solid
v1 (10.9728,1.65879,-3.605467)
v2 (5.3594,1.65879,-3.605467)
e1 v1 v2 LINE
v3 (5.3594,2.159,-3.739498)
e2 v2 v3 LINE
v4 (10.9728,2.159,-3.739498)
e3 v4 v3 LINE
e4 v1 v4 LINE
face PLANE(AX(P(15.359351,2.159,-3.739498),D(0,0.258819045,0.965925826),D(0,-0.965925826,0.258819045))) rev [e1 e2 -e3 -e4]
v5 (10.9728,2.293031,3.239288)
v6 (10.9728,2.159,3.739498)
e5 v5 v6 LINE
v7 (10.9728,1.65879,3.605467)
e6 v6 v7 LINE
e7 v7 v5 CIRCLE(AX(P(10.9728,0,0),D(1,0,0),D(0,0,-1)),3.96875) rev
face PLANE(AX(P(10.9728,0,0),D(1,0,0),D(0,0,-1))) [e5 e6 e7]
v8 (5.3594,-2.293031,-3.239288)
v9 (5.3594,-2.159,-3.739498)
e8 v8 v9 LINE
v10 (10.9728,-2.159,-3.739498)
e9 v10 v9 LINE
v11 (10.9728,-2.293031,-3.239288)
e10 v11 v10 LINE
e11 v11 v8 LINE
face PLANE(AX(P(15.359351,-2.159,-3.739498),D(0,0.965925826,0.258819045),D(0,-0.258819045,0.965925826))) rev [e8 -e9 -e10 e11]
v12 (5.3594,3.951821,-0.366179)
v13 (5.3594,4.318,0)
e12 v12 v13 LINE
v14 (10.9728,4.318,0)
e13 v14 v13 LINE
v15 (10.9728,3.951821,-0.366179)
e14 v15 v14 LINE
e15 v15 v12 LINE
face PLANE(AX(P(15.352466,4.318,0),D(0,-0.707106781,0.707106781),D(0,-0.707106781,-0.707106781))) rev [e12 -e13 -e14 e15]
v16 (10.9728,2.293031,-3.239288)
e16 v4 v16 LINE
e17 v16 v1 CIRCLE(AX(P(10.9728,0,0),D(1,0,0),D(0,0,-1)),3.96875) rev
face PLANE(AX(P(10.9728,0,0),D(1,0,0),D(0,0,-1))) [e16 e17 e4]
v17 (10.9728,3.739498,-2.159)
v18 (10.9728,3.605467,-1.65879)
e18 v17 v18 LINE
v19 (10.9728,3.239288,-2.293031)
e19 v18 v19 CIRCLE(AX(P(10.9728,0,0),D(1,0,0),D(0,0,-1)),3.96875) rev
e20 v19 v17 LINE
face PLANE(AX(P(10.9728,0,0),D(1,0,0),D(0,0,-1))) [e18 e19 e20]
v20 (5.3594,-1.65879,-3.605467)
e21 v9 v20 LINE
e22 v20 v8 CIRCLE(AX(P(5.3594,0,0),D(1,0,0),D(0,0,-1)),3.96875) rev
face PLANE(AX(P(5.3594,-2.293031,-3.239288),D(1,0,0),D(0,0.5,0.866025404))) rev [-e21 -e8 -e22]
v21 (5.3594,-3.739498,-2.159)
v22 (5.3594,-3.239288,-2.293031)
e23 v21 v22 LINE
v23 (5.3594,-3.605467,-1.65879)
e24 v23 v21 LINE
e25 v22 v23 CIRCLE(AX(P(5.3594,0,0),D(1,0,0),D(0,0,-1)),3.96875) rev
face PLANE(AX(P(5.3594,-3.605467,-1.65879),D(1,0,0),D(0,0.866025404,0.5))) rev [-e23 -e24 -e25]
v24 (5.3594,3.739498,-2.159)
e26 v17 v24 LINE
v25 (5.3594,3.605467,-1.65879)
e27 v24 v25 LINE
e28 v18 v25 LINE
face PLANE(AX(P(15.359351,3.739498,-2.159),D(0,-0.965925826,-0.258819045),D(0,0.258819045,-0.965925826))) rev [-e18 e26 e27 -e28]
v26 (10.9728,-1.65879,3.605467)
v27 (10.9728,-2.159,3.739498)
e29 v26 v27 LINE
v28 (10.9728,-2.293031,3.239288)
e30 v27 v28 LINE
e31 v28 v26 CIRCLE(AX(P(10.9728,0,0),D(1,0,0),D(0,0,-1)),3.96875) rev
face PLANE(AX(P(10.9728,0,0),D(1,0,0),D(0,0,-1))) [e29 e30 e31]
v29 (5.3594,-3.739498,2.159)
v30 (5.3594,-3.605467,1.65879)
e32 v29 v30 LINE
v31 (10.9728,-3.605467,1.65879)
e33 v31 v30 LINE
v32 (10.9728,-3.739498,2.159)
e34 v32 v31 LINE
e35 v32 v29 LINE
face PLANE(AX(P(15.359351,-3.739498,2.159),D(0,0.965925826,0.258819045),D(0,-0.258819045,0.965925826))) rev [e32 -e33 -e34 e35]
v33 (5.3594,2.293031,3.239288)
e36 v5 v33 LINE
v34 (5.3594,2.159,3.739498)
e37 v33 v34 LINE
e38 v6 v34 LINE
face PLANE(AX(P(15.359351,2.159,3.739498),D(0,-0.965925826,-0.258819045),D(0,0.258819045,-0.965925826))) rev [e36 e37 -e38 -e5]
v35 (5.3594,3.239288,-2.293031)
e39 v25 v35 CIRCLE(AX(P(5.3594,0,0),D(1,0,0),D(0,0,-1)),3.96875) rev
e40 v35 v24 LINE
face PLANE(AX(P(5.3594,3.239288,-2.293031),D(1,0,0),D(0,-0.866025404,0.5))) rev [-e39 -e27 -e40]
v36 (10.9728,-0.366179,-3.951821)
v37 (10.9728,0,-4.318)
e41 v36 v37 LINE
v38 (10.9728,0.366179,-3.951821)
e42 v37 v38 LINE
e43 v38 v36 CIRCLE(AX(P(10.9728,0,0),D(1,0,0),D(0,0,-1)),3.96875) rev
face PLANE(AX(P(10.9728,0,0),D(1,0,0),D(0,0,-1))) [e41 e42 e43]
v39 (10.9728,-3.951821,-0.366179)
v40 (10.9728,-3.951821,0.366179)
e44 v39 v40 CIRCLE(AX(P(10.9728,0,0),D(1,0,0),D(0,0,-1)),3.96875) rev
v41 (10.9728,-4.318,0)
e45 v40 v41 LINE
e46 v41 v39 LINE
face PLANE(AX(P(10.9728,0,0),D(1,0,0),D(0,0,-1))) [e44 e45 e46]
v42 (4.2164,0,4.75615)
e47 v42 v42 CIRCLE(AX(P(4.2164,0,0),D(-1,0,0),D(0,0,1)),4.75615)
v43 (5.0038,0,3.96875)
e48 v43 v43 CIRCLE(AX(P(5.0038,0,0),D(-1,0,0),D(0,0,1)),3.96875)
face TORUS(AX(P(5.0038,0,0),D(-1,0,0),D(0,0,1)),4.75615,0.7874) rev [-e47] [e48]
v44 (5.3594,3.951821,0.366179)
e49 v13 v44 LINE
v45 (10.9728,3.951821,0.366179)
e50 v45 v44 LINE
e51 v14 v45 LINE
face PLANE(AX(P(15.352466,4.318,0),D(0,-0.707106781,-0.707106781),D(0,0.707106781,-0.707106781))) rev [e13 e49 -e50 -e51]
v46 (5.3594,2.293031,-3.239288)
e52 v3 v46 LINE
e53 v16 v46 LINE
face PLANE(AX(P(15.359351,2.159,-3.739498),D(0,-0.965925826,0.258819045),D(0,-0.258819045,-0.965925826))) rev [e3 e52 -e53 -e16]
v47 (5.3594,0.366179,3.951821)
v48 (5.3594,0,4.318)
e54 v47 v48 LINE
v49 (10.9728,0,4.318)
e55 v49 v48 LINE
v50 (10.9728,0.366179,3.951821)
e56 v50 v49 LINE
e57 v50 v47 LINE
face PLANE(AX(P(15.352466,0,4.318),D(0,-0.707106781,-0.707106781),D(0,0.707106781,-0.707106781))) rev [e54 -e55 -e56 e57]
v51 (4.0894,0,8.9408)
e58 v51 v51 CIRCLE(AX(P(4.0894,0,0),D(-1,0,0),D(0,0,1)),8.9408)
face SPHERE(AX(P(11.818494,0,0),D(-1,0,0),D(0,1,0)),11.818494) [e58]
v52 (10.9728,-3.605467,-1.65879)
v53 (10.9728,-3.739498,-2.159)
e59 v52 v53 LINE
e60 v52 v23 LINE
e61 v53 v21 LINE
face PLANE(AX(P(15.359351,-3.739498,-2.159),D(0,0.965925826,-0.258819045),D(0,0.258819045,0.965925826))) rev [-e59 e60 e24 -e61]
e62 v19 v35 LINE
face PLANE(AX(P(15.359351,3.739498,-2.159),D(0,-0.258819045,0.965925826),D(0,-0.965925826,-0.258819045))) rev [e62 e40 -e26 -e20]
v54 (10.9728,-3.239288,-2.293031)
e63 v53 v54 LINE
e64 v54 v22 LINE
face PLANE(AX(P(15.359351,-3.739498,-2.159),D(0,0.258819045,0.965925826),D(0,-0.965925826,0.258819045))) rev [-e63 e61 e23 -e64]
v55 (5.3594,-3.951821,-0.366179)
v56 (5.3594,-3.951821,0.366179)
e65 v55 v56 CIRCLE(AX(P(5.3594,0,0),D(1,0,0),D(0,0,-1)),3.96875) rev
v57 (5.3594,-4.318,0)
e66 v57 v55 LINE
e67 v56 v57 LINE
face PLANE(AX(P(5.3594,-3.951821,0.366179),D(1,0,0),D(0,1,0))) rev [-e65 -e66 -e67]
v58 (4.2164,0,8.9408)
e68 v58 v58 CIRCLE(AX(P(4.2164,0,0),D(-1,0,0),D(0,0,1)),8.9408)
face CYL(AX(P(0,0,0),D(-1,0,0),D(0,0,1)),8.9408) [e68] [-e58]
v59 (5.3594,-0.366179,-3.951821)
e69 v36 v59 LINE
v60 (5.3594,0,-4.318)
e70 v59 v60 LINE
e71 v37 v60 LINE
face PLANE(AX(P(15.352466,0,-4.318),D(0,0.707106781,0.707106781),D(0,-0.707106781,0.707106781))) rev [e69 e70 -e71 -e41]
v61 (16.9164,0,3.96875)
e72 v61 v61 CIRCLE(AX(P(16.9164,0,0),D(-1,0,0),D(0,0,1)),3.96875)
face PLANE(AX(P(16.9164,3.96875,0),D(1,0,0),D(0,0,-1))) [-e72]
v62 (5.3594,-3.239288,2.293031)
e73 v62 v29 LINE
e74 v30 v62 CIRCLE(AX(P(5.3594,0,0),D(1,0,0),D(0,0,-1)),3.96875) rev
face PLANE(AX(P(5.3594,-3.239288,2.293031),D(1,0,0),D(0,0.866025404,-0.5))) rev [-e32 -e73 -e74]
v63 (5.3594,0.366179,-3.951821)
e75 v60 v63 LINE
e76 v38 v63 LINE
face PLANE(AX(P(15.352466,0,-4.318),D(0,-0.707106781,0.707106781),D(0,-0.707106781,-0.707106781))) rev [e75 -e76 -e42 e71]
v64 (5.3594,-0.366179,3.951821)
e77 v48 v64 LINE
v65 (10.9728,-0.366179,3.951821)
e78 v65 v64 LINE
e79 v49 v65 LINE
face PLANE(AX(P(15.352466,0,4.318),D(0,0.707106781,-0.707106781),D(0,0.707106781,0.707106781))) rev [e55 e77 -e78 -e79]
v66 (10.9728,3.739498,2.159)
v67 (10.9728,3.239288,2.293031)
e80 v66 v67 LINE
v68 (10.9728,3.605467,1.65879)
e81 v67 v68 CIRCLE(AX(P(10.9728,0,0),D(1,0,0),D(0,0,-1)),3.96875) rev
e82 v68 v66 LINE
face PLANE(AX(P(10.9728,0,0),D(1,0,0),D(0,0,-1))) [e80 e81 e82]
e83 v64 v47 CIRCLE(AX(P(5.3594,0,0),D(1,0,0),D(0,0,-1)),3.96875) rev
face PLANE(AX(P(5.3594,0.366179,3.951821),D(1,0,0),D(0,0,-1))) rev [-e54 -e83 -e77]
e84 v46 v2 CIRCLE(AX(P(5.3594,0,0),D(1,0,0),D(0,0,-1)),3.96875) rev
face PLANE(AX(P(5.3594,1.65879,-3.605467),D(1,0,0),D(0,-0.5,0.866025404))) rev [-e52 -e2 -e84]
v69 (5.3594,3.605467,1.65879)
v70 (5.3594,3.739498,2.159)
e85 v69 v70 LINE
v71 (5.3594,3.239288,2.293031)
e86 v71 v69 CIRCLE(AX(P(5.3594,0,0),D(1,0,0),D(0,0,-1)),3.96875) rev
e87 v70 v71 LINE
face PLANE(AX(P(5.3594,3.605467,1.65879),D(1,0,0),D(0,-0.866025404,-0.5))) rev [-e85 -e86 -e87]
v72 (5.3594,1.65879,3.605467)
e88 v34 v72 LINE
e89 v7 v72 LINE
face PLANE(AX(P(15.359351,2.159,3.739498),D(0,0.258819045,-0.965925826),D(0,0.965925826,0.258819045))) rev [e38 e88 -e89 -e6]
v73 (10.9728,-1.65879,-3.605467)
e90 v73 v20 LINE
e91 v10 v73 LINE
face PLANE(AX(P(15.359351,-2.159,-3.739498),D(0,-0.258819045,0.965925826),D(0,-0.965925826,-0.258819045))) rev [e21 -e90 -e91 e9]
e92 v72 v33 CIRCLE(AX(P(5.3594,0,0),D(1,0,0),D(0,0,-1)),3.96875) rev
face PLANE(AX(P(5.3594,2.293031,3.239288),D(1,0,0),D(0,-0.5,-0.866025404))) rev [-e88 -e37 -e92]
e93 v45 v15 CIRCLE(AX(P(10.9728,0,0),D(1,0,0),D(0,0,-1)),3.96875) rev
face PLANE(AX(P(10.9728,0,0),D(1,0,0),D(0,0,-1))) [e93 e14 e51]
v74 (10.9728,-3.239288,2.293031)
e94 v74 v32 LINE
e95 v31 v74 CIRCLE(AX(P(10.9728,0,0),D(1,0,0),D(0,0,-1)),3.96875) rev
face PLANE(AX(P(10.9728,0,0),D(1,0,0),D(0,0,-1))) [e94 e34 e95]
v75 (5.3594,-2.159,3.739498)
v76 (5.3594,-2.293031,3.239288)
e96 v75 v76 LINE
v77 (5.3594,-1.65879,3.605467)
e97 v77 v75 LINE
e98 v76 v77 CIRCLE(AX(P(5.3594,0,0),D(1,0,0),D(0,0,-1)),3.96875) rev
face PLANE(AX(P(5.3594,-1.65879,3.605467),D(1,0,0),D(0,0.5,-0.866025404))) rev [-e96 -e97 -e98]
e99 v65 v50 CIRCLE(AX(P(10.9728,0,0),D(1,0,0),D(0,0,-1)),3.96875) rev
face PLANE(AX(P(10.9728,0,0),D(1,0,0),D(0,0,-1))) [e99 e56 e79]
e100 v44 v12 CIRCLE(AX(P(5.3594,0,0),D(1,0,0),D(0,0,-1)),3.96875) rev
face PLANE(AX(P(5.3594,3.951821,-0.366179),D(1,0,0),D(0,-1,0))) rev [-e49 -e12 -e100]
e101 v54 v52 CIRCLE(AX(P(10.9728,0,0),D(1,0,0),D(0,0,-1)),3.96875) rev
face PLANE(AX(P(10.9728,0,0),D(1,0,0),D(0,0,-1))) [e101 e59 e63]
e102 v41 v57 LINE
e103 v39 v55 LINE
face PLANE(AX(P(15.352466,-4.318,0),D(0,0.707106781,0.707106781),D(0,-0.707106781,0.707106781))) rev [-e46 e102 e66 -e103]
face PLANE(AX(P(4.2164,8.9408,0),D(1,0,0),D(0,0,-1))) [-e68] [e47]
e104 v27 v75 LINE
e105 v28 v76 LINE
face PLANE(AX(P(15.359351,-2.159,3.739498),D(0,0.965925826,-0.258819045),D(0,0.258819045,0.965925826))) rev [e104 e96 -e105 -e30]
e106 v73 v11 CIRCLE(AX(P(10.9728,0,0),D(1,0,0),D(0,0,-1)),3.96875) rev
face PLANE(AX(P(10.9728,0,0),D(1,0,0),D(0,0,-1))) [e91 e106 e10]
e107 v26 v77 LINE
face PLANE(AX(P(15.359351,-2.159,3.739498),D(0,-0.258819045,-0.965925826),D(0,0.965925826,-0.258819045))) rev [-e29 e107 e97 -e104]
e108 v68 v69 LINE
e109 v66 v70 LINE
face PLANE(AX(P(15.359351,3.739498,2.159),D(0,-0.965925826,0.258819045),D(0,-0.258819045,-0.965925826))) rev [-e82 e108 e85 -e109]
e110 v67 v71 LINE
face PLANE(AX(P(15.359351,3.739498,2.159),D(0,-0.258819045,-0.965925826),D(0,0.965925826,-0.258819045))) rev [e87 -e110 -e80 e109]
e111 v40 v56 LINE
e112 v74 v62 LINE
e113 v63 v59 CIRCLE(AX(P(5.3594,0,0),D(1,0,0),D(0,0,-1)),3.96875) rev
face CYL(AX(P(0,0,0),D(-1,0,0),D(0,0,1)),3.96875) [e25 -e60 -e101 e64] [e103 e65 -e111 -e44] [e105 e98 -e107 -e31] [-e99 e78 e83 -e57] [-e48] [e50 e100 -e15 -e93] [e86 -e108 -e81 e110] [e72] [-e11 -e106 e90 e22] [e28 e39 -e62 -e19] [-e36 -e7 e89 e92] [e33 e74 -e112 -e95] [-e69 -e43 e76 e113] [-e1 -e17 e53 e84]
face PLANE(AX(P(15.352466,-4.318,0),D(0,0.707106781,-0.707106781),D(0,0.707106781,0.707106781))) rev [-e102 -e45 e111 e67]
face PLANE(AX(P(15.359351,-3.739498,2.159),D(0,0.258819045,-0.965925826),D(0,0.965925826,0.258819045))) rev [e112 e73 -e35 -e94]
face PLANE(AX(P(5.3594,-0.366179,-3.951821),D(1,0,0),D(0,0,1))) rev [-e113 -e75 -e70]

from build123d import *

# Parameters (mm, degrees)
BOSS_EXTRUDE1_DEPTH = 5.6134
CIRPATTERN1_COUNT   = 12


# Read off the part's stored shape, not the designer's step: ThreadSchematic
with BuildPart() as part:
    # ThreadSchematic outline → ThreadSchematic (revolve)
    with BuildSketch(Plane.YX):
        with BuildLine():
            Line((0, 16.9164), (0, 0))
            ThreePointArc((0, 0), (4.915818779, 1.070865158), (8.940800003, 4.089400003))
            Line((8.940800003, 4.089400003), (8.9408, 4.2164))
            Line((8.9408, 4.2164), (4.75615, 4.2164))
            ThreePointArc((4.75615, 4.2164), (4.19937412, 4.44702412), (3.96875, 5.0038))
            Line((3.96875, 5.0038), (3.96875, 16.9164))
            Line((3.96875, 16.9164), (0, 16.9164))
        make_face()
    revolve(axis=Axis((0, 0, 0), (1, 0, 0)))

    # Sketch2 → Boss-Extrude1 (add)
    with BuildSketch(Plane(origin=(5.3594, 0, 0), x_dir=(0, 0, -1), z_dir=(1, 0, 0))):
        Polygon((-4.318, 0), (-3.95182104, -0.36617896), (0, 0), (-3.95182104, 0.36617896), align=None)
    boss_extrude1 = extrude(amount=BOSS_EXTRUDE1_DEPTH)

    # CirPattern1: Boss-Extrude1 ×12 about axis
    cirpattern1_axis = Axis((0, 0, 0), (1, 0, 0))
    for i in range(1, CIRPATTERN1_COUNT):
        add(boss_extrude1.rotate(cirpattern1_axis, i * 360 / CIRPATTERN1_COUNT))


solid = part.part
